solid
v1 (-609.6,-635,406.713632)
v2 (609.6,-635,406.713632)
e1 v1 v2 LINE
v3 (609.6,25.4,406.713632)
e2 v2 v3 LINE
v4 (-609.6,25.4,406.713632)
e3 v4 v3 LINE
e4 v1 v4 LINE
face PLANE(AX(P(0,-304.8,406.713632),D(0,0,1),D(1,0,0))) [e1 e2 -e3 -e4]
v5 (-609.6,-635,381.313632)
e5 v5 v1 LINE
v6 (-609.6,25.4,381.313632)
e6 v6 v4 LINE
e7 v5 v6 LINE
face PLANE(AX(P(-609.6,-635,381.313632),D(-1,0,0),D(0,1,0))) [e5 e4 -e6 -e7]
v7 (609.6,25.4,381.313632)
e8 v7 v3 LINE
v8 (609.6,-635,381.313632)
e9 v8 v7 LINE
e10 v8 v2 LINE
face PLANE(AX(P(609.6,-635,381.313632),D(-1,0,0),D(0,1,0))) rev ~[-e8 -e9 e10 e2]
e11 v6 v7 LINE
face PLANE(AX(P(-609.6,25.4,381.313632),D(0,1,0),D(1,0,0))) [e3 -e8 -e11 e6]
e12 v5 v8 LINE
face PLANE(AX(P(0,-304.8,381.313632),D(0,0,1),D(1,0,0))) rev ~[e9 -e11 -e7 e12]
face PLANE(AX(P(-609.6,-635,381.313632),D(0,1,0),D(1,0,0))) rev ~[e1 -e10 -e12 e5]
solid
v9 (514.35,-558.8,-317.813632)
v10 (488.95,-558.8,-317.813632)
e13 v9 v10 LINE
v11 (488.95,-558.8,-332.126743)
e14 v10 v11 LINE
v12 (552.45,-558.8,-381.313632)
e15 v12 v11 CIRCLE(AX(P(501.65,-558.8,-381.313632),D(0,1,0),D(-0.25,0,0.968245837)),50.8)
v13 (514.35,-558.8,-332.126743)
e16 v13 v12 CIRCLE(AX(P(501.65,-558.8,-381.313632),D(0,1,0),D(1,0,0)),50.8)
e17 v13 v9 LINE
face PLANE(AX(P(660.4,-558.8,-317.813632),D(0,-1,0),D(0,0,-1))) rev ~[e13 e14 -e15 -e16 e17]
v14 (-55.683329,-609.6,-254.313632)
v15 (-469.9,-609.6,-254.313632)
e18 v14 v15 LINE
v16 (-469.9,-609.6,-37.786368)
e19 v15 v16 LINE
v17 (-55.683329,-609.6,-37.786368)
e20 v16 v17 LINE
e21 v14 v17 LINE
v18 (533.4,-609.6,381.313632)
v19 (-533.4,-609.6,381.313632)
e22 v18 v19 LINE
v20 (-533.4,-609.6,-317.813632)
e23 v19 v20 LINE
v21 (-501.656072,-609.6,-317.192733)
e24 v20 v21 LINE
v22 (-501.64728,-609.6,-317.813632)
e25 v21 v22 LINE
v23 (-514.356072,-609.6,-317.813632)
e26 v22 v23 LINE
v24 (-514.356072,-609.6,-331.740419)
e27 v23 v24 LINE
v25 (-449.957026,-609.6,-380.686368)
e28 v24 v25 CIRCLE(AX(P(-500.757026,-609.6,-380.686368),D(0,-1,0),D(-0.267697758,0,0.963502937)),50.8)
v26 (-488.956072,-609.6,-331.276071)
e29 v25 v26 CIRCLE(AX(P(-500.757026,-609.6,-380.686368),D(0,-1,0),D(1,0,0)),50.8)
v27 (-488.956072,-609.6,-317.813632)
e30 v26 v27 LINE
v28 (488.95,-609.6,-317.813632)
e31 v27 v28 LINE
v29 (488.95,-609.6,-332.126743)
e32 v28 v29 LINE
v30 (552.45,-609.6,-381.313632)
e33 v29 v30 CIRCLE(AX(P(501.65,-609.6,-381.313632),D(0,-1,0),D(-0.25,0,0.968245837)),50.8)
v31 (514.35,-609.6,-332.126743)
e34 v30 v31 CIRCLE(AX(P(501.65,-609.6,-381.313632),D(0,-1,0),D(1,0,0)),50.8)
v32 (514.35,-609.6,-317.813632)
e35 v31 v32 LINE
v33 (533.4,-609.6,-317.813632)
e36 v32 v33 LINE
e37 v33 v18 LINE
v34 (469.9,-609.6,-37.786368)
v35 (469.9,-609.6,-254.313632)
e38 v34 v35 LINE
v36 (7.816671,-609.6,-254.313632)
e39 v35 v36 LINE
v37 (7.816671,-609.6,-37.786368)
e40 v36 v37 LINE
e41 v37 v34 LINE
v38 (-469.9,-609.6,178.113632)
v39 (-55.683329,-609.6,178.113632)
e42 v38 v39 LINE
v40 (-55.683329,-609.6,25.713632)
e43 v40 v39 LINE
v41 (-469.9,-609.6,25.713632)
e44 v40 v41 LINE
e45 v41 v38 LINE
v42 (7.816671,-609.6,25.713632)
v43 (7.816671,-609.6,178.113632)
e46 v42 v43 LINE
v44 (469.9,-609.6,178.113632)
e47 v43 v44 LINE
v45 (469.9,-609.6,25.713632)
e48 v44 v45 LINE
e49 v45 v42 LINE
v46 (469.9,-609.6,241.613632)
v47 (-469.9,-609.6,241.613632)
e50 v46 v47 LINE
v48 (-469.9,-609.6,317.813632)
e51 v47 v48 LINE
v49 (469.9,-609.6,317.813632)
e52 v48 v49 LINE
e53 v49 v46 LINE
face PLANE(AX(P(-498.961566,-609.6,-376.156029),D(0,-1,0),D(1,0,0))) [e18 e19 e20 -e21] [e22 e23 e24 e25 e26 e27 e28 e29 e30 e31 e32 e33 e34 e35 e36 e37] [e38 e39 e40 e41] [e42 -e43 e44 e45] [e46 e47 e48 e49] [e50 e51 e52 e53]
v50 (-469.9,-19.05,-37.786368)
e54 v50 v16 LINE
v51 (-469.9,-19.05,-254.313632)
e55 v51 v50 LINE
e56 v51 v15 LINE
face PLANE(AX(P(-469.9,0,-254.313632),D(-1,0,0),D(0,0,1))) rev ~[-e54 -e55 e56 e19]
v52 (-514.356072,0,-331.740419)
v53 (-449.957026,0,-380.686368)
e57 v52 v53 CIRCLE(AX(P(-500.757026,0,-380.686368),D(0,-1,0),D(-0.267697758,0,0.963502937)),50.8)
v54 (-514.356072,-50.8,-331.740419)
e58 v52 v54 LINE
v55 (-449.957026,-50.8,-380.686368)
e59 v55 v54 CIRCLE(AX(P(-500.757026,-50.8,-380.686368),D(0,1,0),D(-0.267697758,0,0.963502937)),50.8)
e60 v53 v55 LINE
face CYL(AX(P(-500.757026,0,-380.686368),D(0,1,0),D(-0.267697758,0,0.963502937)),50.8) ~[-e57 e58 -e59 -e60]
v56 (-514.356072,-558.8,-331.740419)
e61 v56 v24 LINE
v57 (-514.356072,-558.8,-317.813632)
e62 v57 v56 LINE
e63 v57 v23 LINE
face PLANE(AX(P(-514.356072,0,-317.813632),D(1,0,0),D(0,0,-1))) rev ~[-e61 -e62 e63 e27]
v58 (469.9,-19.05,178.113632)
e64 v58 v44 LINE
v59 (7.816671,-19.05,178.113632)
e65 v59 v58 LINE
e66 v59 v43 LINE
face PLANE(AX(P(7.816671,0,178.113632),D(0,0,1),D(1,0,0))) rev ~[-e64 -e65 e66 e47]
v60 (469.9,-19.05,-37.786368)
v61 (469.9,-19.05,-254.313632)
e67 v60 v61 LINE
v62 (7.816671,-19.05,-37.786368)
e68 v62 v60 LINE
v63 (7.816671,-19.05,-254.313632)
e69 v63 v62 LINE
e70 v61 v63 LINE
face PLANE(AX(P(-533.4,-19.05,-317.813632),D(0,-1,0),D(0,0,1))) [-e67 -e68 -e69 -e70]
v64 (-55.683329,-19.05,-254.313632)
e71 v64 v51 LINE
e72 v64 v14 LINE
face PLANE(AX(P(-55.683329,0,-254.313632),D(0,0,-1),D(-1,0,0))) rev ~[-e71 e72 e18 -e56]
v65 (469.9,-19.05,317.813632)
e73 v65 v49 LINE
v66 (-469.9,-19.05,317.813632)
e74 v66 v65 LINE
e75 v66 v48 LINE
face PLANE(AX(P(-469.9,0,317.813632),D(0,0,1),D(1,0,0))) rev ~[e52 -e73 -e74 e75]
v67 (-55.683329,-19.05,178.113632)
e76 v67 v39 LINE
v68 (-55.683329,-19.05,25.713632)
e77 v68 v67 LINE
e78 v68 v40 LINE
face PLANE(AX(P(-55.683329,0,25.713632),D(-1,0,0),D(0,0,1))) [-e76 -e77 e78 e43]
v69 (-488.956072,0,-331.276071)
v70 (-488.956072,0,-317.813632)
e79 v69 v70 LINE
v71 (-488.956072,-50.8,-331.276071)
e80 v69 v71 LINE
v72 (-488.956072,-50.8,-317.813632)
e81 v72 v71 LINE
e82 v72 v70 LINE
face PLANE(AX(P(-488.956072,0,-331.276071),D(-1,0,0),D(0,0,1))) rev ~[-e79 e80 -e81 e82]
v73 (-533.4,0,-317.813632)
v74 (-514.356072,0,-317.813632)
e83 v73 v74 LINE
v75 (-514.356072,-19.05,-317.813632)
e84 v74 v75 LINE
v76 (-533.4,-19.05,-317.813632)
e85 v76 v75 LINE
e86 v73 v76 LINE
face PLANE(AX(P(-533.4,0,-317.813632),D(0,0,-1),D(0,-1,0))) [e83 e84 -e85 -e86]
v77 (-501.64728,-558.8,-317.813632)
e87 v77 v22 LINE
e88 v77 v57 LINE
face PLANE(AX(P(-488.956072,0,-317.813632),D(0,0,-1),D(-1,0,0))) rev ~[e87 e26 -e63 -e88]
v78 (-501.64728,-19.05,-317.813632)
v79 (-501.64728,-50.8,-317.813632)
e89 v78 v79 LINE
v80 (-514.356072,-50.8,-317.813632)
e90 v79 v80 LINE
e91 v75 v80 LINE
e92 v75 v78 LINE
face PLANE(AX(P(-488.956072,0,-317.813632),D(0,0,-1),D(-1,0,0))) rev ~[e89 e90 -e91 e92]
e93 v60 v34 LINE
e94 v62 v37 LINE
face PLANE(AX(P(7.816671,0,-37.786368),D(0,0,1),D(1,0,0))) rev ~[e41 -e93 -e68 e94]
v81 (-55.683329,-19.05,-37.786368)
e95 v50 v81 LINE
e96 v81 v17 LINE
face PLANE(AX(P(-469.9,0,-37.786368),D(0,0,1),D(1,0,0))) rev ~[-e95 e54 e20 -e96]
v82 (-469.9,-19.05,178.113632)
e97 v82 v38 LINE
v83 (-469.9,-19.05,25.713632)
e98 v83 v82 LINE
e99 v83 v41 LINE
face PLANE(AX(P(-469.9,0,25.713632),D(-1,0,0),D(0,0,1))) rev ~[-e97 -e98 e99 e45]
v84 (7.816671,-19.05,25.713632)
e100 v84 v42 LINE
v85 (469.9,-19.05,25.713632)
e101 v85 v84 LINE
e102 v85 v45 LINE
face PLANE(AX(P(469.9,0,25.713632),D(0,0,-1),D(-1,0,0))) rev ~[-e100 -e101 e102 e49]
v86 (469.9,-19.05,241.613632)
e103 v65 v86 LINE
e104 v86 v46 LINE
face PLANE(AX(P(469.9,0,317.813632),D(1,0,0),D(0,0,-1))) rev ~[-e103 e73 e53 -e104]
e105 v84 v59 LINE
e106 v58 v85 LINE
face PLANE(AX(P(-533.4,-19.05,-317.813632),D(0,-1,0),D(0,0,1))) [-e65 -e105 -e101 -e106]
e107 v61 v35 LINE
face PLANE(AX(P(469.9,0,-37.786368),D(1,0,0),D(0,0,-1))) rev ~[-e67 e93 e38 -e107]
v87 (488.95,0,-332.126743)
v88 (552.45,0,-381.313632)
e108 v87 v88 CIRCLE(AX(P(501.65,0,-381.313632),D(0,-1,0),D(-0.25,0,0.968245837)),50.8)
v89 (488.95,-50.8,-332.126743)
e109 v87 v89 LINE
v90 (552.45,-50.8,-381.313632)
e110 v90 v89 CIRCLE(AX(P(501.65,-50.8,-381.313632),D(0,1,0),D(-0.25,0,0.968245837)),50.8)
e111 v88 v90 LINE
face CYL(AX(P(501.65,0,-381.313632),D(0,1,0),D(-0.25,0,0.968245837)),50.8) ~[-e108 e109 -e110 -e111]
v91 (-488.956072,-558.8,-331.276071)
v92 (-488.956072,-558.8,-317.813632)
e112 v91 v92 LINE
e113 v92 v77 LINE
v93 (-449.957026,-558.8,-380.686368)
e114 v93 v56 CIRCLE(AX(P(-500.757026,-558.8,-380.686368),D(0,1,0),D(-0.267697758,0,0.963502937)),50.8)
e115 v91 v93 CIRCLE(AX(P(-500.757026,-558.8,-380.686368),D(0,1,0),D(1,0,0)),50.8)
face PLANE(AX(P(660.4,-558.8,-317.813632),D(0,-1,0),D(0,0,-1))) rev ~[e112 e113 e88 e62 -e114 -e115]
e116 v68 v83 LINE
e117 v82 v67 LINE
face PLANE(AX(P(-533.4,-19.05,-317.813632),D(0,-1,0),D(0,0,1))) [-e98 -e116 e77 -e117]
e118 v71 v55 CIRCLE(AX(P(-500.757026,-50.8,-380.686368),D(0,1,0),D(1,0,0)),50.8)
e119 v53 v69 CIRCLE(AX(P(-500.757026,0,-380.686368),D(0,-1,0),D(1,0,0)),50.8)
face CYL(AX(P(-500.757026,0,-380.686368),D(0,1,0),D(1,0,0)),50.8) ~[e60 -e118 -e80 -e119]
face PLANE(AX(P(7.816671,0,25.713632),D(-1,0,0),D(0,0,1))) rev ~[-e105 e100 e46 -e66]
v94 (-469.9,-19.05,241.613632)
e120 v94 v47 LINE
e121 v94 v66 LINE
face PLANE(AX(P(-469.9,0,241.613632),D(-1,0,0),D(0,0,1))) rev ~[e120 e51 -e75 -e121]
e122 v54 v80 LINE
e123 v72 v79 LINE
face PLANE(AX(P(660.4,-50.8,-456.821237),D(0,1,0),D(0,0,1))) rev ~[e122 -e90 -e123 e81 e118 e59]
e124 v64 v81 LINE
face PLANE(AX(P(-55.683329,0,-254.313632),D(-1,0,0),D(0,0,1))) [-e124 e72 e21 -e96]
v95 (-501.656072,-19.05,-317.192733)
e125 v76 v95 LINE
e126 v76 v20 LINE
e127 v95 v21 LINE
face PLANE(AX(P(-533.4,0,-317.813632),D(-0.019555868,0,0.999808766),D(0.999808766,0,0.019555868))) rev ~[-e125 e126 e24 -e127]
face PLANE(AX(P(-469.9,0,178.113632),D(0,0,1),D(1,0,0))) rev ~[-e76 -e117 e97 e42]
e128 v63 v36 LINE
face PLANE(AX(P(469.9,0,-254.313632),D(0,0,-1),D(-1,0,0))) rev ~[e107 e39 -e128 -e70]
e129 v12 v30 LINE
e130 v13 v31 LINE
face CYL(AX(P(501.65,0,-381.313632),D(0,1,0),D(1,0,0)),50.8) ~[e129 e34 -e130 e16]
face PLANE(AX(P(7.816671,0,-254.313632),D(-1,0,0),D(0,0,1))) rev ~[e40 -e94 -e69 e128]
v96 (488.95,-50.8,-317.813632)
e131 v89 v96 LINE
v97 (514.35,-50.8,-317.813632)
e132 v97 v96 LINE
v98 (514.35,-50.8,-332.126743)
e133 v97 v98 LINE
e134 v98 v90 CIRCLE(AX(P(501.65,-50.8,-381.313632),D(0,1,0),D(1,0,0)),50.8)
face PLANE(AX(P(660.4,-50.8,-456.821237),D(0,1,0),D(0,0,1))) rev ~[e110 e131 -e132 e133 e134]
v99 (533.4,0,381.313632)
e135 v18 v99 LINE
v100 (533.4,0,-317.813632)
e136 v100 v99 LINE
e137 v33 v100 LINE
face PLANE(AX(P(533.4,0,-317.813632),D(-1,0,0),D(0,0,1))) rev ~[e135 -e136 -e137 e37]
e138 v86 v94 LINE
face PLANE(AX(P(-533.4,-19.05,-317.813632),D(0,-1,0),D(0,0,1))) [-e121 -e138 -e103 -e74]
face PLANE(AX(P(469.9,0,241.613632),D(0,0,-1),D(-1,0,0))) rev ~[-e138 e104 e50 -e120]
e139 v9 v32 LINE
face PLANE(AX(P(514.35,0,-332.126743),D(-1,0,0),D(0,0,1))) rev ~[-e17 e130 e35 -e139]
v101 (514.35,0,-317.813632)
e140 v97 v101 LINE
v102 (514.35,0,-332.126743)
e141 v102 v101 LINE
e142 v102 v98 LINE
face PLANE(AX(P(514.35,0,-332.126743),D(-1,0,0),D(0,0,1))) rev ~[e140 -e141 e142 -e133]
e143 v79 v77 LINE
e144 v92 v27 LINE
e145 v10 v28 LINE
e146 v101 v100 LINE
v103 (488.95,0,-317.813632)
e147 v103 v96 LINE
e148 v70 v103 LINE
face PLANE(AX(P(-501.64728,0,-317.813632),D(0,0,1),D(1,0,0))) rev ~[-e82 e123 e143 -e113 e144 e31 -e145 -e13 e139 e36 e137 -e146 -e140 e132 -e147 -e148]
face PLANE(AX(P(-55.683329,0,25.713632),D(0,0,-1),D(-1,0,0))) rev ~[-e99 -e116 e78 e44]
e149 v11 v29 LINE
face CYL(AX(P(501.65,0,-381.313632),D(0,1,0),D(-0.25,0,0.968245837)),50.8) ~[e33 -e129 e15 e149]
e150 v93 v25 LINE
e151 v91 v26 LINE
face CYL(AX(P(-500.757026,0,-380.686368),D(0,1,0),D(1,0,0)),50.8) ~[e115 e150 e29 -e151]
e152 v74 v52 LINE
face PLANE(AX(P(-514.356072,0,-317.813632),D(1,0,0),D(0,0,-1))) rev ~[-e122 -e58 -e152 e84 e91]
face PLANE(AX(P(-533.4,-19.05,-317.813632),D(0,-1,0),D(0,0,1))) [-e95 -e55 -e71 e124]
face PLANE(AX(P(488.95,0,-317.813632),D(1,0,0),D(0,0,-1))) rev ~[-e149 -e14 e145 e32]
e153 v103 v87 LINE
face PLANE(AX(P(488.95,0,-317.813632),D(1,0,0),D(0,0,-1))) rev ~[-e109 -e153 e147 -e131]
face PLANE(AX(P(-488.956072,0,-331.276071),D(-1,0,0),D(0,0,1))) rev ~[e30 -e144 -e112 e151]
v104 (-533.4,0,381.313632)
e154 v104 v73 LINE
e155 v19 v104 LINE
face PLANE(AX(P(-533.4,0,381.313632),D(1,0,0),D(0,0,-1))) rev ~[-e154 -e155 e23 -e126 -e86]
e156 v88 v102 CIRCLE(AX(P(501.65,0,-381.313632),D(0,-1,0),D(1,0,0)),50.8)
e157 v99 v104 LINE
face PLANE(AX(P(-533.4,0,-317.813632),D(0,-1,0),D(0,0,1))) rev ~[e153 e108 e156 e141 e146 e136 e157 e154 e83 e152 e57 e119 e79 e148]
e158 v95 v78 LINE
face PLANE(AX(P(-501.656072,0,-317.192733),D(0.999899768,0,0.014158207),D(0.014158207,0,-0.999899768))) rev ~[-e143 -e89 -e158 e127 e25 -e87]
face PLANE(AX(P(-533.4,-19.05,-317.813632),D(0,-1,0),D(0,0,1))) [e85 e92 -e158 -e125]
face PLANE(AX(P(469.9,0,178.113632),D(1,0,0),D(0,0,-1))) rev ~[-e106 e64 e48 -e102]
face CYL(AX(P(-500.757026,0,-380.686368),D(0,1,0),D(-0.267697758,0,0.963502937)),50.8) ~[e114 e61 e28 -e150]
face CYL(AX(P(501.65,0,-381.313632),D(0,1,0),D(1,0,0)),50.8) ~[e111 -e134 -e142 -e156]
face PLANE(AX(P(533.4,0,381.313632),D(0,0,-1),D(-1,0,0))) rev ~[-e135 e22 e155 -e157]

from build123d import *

# Parameters (mm, degrees)
F0_W     = 414.2166706732
F0_H     = 63.5
F0_W_2   = 63.5
F0_H_2   = 216.5272635669
F0_W_3   = 462.0833293268
F0_H_3   = 152.4
F1_DEPTH = 609.6
F2_DEPTH = 609.6
F5_DEPTH = 1242.06
F6_W     = 19.05
F6_H     = 699.1272635669
F7_DEPTH = 1066.8
F8_W     = 1219.2
F8_H     = 660.4
F8_W_2   = 1066.8
F8_H_2   = 609.6
F9_DEPTH = 25.4


with BuildPart() as f1:
    # F0 (on Front) → F1 (new body)
    with BuildSketch(Plane.XZ):
        Polygon((469.9, -273.3665645704), (469.9, -317.8136317834), (488.95, -317.8136317834), (488.95, -292.4136317834), (514.35, -292.4136317834), (514.35, -317.8136317834), (533.4, -317.8136317834), (533.4, 317.8136317834), (469.9, 317.8136317834), (469.9, 241.6136317834), (469.9, 178.1136317834), (469.9, 25.7136317834), (469.9, -37.7863682166), (469.9, -254.3136317834), align=None)
        Polygon((-469.9, -317.8136317834), (469.9, -317.8136317834), (469.9, -273.3665645704), (469.9, -254.3136317834), (7.8166706732, -254.3136317834), (-55.6833293268, -254.3136317834), (-469.9, -254.3136317834), align=None)
        Polygon((-488.9560716881, -317.8136317834), (-469.9, -317.8136317834), (-469.9, -254.3136317834), (-469.9, -37.7863682166), (-469.9, 25.7136317834), (-469.9, 178.1136317834), (-469.9, 241.6136317834), (-469.9, 317.8136317834), (-533.4, 317.8136317834), (-533.4, -317.8136317834), (-514.3560716881, -317.4411400029), (-514.3560716881, -291.792732976), (-488.9560716881, -291.792732976), align=None)
        Polygon((488.95, -292.4136317834), (488.95, -317.8136317834), (501.65, -317.8136317834), (514.35, -317.8136317834), (514.35, -292.4136317834), align=None)
        Polygon((-501.6472799932, -317.8136317834), (-488.9560716881, -317.8136317834), (-488.9560716881, -291.792732976), (-514.3560716881, -291.792732976), (-514.3560716881, -317.4411400029), (-501.6560716881, -317.192732976), align=None)
        with Locations((-262.7916646634, -6.0363682166)):
            Rectangle(F0_W, F0_H)
        with Locations((-23.9333293268, -146.05)):
            Rectangle(F0_W_2, F0_H_2)
        with Locations((238.8583353366, -6.0363682166)):
            Rectangle(F0_W_3, F0_H)
        with Locations((-23.9333293268, -6.0363682166)):
            Rectangle(F0_W_2, F0_H)
        Polygon((-469.9, 241.6136317834), (-469.9, 178.1136317834), (-55.6833293268, 178.1136317834), (7.8166706732, 178.1136317834), (469.9, 178.1136317834), (469.9, 241.6136317834), align=None)
        with Locations((-23.9333293268, 101.9136317834)):
            Rectangle(F0_W_2, F0_H_3)
        Polygon((469.9, 317.8136317834), (533.4, 317.8136317834), (533.4, 381.3136317834), (-533.4, 381.3136317834), (-533.4, 317.8136317834), (-469.9, 317.8136317834), align=None)
    extrude(amount=F1_DEPTH)

    # F0 (on Front) → F2 (join)
    with BuildSketch(Plane.XZ):
        with BuildLine():
            ThreePointArc((-449.9570255615, -380.6863682166), (-460.8814161194, -349.2129544898), (-488.9560716881, -331.2760708315))
            Line((-488.9560716881, -331.2760708315), (-488.9560716881, -342.592732976))
            Line((-488.9560716881, -342.592732976), (-501.2964171884, -342.592732976))
            Line((-501.2964171884, -342.592732976), (-514.3560716881, -342.592732976))
            Line((-514.3560716881, -342.592732976), (-514.3560716881, -331.7404190027))
            ThreePointArc((-514.3560716881, -331.7404190027), (-531.4963200945, -421.1305986038), (-449.9570255615, -380.6863682166))
        make_face()
        with BuildLine():
            Line((-501.2964171884, -342.592732976), (-501.4762624628, -329.8914600241))
            ThreePointArc((-501.4762624628, -329.8914600241), (-507.9756105712, -330.4018573762), (-514.3560716881, -331.7404190027))
            Line((-514.3560716881, -331.7404190027), (-514.3560716881, -342.592732976))
            Line((-514.3560716881, -342.592732976), (-501.2964171884, -342.592732976))
        make_face()
        with BuildLine():
            Line((-501.4762624628, -329.8914600241), (-501.6472799932, -317.8136317834))
            Line((-501.6472799932, -317.8136317834), (-514.3560716881, -317.8136317834))
            Line((-514.3560716881, -317.8136317834), (-514.3560716881, -331.7404190027))
            ThreePointArc((-514.3560716881, -331.7404190027), (-507.9756105712, -330.4018573762), (-501.4762624628, -329.8914600241))
        make_face()
        with BuildLine():
            Line((-488.9560716881, -331.2760708315), (-488.9560716881, -317.8136317834))
            Line((-488.9560716881, -317.8136317834), (-501.6472799932, -317.8136317834))
            Line((-501.6472799932, -317.8136317834), (-501.4762624628, -329.8914600241))
            ThreePointArc((-501.4762624628, -329.8914600241), (-495.1730843427, -330.194194561), (-488.9560716881, -331.2760708315))
        make_face()
        with BuildLine():
            Line((-488.9560716881, -342.592732976), (-488.9560716881, -331.2760708315))
            ThreePointArc((-488.9560716881, -331.2760708315), (-495.1730843427, -330.194194561), (-501.4762624628, -329.8914600241))
            Line((-501.4762624628, -329.8914600241), (-501.2964171884, -342.592732976))
            Line((-501.2964171884, -342.592732976), (-488.9560716881, -342.592732976))
        make_face()
        with BuildLine():
            Line((488.95, -343.2136317834), (488.95, -332.1267432866))
            ThreePointArc((488.95, -332.1267432866), (470.5414802667, -421.4745580676), (552.45, -381.3136317834))
            ThreePointArc((552.45, -381.3136317834), (541.8109262841, -350.2051120501), (514.35, -332.1267432866))
            Line((514.35, -332.1267432866), (514.35, -343.2136317834))
            Line((514.35, -343.2136317834), (501.65, -343.2136317834))
            Line((501.65, -343.2136317834), (488.95, -343.2136317834))
        make_face()
        with BuildLine():
            ThreePointArc((514.35, -332.1267432866), (508.0510180581, -330.9185232131), (501.65, -330.5136317834))
            Line((501.65, -330.5136317834), (501.65, -343.2136317834))
            Line((501.65, -343.2136317834), (514.35, -343.2136317834))
            Line((514.35, -343.2136317834), (514.35, -332.1267432866))
        make_face()
        with BuildLine():
            Line((501.65, -317.8136317834), (488.95, -317.8136317834))
            Line((488.95, -317.8136317834), (488.95, -332.1267432866))
            ThreePointArc((488.95, -332.1267432866), (495.2489819419, -330.9185232131), (501.65, -330.5136317834))
            Line((501.65, -330.5136317834), (501.65, -317.8136317834))
        make_face()
        with BuildLine():
            Line((514.35, -317.8136317834), (501.65, -317.8136317834))
            Line((501.65, -317.8136317834), (501.65, -330.5136317834))
            ThreePointArc((501.65, -330.5136317834), (508.0510180581, -330.9185232131), (514.35, -332.1267432866))
            Line((514.35, -332.1267432866), (514.35, -317.8136317834))
        make_face()
        with BuildLine():
            ThreePointArc((501.65, -330.5136317834), (495.2489819419, -330.9185232131), (488.95, -332.1267432866))
            Line((488.95, -332.1267432866), (488.95, -343.2136317834))
            Line((488.95, -343.2136317834), (501.65, -343.2136317834))
            Line((501.65, -343.2136317834), (501.65, -330.5136317834))
        make_face()
    extrude(amount=F2_DEPTH)

    # F4 (on offset) → F5 (cut)
    with BuildSketch(Plane.YZ.offset(660.4)):
        Polygon((-50.8, -317.8136317834), (-558.8, -317.8136317834), (-558.8, -353.9129836664), (-558.8, -456.8212373361), (-50.8, -456.8212373361), (-50.8, -353.9129836664), align=None)
    extrude(amount=-F5_DEPTH, mode=Mode.SUBTRACT)

    # F6 (on face) → F7 (join)
    with BuildSketch(Plane(origin=(-533.4, 0, 0), x_dir=(0, -1, 0), z_dir=(-1, 0, 0))):
        with Locations((9.525, 31.75)):
            Rectangle(F6_W, F6_H)
    extrude(amount=-F7_DEPTH)


with BuildPart() as f9:
    # F8 (on face) → F9 (new body)
    with BuildSketch(Plane.XY.offset(381.3136317834)):
        with Locations((0, -304.8)):
            Rectangle(F8_W, F8_H)
        with Locations((0, -304.8)):
            Rectangle(F8_W_2, F8_H_2, mode=Mode.SUBTRACT)
        with Locations((0, -304.8)):
            Rectangle(F8_W_2, F8_H_2)
    extrude(amount=F9_DEPTH)


solid = Compound([f1.part, f9.part])
